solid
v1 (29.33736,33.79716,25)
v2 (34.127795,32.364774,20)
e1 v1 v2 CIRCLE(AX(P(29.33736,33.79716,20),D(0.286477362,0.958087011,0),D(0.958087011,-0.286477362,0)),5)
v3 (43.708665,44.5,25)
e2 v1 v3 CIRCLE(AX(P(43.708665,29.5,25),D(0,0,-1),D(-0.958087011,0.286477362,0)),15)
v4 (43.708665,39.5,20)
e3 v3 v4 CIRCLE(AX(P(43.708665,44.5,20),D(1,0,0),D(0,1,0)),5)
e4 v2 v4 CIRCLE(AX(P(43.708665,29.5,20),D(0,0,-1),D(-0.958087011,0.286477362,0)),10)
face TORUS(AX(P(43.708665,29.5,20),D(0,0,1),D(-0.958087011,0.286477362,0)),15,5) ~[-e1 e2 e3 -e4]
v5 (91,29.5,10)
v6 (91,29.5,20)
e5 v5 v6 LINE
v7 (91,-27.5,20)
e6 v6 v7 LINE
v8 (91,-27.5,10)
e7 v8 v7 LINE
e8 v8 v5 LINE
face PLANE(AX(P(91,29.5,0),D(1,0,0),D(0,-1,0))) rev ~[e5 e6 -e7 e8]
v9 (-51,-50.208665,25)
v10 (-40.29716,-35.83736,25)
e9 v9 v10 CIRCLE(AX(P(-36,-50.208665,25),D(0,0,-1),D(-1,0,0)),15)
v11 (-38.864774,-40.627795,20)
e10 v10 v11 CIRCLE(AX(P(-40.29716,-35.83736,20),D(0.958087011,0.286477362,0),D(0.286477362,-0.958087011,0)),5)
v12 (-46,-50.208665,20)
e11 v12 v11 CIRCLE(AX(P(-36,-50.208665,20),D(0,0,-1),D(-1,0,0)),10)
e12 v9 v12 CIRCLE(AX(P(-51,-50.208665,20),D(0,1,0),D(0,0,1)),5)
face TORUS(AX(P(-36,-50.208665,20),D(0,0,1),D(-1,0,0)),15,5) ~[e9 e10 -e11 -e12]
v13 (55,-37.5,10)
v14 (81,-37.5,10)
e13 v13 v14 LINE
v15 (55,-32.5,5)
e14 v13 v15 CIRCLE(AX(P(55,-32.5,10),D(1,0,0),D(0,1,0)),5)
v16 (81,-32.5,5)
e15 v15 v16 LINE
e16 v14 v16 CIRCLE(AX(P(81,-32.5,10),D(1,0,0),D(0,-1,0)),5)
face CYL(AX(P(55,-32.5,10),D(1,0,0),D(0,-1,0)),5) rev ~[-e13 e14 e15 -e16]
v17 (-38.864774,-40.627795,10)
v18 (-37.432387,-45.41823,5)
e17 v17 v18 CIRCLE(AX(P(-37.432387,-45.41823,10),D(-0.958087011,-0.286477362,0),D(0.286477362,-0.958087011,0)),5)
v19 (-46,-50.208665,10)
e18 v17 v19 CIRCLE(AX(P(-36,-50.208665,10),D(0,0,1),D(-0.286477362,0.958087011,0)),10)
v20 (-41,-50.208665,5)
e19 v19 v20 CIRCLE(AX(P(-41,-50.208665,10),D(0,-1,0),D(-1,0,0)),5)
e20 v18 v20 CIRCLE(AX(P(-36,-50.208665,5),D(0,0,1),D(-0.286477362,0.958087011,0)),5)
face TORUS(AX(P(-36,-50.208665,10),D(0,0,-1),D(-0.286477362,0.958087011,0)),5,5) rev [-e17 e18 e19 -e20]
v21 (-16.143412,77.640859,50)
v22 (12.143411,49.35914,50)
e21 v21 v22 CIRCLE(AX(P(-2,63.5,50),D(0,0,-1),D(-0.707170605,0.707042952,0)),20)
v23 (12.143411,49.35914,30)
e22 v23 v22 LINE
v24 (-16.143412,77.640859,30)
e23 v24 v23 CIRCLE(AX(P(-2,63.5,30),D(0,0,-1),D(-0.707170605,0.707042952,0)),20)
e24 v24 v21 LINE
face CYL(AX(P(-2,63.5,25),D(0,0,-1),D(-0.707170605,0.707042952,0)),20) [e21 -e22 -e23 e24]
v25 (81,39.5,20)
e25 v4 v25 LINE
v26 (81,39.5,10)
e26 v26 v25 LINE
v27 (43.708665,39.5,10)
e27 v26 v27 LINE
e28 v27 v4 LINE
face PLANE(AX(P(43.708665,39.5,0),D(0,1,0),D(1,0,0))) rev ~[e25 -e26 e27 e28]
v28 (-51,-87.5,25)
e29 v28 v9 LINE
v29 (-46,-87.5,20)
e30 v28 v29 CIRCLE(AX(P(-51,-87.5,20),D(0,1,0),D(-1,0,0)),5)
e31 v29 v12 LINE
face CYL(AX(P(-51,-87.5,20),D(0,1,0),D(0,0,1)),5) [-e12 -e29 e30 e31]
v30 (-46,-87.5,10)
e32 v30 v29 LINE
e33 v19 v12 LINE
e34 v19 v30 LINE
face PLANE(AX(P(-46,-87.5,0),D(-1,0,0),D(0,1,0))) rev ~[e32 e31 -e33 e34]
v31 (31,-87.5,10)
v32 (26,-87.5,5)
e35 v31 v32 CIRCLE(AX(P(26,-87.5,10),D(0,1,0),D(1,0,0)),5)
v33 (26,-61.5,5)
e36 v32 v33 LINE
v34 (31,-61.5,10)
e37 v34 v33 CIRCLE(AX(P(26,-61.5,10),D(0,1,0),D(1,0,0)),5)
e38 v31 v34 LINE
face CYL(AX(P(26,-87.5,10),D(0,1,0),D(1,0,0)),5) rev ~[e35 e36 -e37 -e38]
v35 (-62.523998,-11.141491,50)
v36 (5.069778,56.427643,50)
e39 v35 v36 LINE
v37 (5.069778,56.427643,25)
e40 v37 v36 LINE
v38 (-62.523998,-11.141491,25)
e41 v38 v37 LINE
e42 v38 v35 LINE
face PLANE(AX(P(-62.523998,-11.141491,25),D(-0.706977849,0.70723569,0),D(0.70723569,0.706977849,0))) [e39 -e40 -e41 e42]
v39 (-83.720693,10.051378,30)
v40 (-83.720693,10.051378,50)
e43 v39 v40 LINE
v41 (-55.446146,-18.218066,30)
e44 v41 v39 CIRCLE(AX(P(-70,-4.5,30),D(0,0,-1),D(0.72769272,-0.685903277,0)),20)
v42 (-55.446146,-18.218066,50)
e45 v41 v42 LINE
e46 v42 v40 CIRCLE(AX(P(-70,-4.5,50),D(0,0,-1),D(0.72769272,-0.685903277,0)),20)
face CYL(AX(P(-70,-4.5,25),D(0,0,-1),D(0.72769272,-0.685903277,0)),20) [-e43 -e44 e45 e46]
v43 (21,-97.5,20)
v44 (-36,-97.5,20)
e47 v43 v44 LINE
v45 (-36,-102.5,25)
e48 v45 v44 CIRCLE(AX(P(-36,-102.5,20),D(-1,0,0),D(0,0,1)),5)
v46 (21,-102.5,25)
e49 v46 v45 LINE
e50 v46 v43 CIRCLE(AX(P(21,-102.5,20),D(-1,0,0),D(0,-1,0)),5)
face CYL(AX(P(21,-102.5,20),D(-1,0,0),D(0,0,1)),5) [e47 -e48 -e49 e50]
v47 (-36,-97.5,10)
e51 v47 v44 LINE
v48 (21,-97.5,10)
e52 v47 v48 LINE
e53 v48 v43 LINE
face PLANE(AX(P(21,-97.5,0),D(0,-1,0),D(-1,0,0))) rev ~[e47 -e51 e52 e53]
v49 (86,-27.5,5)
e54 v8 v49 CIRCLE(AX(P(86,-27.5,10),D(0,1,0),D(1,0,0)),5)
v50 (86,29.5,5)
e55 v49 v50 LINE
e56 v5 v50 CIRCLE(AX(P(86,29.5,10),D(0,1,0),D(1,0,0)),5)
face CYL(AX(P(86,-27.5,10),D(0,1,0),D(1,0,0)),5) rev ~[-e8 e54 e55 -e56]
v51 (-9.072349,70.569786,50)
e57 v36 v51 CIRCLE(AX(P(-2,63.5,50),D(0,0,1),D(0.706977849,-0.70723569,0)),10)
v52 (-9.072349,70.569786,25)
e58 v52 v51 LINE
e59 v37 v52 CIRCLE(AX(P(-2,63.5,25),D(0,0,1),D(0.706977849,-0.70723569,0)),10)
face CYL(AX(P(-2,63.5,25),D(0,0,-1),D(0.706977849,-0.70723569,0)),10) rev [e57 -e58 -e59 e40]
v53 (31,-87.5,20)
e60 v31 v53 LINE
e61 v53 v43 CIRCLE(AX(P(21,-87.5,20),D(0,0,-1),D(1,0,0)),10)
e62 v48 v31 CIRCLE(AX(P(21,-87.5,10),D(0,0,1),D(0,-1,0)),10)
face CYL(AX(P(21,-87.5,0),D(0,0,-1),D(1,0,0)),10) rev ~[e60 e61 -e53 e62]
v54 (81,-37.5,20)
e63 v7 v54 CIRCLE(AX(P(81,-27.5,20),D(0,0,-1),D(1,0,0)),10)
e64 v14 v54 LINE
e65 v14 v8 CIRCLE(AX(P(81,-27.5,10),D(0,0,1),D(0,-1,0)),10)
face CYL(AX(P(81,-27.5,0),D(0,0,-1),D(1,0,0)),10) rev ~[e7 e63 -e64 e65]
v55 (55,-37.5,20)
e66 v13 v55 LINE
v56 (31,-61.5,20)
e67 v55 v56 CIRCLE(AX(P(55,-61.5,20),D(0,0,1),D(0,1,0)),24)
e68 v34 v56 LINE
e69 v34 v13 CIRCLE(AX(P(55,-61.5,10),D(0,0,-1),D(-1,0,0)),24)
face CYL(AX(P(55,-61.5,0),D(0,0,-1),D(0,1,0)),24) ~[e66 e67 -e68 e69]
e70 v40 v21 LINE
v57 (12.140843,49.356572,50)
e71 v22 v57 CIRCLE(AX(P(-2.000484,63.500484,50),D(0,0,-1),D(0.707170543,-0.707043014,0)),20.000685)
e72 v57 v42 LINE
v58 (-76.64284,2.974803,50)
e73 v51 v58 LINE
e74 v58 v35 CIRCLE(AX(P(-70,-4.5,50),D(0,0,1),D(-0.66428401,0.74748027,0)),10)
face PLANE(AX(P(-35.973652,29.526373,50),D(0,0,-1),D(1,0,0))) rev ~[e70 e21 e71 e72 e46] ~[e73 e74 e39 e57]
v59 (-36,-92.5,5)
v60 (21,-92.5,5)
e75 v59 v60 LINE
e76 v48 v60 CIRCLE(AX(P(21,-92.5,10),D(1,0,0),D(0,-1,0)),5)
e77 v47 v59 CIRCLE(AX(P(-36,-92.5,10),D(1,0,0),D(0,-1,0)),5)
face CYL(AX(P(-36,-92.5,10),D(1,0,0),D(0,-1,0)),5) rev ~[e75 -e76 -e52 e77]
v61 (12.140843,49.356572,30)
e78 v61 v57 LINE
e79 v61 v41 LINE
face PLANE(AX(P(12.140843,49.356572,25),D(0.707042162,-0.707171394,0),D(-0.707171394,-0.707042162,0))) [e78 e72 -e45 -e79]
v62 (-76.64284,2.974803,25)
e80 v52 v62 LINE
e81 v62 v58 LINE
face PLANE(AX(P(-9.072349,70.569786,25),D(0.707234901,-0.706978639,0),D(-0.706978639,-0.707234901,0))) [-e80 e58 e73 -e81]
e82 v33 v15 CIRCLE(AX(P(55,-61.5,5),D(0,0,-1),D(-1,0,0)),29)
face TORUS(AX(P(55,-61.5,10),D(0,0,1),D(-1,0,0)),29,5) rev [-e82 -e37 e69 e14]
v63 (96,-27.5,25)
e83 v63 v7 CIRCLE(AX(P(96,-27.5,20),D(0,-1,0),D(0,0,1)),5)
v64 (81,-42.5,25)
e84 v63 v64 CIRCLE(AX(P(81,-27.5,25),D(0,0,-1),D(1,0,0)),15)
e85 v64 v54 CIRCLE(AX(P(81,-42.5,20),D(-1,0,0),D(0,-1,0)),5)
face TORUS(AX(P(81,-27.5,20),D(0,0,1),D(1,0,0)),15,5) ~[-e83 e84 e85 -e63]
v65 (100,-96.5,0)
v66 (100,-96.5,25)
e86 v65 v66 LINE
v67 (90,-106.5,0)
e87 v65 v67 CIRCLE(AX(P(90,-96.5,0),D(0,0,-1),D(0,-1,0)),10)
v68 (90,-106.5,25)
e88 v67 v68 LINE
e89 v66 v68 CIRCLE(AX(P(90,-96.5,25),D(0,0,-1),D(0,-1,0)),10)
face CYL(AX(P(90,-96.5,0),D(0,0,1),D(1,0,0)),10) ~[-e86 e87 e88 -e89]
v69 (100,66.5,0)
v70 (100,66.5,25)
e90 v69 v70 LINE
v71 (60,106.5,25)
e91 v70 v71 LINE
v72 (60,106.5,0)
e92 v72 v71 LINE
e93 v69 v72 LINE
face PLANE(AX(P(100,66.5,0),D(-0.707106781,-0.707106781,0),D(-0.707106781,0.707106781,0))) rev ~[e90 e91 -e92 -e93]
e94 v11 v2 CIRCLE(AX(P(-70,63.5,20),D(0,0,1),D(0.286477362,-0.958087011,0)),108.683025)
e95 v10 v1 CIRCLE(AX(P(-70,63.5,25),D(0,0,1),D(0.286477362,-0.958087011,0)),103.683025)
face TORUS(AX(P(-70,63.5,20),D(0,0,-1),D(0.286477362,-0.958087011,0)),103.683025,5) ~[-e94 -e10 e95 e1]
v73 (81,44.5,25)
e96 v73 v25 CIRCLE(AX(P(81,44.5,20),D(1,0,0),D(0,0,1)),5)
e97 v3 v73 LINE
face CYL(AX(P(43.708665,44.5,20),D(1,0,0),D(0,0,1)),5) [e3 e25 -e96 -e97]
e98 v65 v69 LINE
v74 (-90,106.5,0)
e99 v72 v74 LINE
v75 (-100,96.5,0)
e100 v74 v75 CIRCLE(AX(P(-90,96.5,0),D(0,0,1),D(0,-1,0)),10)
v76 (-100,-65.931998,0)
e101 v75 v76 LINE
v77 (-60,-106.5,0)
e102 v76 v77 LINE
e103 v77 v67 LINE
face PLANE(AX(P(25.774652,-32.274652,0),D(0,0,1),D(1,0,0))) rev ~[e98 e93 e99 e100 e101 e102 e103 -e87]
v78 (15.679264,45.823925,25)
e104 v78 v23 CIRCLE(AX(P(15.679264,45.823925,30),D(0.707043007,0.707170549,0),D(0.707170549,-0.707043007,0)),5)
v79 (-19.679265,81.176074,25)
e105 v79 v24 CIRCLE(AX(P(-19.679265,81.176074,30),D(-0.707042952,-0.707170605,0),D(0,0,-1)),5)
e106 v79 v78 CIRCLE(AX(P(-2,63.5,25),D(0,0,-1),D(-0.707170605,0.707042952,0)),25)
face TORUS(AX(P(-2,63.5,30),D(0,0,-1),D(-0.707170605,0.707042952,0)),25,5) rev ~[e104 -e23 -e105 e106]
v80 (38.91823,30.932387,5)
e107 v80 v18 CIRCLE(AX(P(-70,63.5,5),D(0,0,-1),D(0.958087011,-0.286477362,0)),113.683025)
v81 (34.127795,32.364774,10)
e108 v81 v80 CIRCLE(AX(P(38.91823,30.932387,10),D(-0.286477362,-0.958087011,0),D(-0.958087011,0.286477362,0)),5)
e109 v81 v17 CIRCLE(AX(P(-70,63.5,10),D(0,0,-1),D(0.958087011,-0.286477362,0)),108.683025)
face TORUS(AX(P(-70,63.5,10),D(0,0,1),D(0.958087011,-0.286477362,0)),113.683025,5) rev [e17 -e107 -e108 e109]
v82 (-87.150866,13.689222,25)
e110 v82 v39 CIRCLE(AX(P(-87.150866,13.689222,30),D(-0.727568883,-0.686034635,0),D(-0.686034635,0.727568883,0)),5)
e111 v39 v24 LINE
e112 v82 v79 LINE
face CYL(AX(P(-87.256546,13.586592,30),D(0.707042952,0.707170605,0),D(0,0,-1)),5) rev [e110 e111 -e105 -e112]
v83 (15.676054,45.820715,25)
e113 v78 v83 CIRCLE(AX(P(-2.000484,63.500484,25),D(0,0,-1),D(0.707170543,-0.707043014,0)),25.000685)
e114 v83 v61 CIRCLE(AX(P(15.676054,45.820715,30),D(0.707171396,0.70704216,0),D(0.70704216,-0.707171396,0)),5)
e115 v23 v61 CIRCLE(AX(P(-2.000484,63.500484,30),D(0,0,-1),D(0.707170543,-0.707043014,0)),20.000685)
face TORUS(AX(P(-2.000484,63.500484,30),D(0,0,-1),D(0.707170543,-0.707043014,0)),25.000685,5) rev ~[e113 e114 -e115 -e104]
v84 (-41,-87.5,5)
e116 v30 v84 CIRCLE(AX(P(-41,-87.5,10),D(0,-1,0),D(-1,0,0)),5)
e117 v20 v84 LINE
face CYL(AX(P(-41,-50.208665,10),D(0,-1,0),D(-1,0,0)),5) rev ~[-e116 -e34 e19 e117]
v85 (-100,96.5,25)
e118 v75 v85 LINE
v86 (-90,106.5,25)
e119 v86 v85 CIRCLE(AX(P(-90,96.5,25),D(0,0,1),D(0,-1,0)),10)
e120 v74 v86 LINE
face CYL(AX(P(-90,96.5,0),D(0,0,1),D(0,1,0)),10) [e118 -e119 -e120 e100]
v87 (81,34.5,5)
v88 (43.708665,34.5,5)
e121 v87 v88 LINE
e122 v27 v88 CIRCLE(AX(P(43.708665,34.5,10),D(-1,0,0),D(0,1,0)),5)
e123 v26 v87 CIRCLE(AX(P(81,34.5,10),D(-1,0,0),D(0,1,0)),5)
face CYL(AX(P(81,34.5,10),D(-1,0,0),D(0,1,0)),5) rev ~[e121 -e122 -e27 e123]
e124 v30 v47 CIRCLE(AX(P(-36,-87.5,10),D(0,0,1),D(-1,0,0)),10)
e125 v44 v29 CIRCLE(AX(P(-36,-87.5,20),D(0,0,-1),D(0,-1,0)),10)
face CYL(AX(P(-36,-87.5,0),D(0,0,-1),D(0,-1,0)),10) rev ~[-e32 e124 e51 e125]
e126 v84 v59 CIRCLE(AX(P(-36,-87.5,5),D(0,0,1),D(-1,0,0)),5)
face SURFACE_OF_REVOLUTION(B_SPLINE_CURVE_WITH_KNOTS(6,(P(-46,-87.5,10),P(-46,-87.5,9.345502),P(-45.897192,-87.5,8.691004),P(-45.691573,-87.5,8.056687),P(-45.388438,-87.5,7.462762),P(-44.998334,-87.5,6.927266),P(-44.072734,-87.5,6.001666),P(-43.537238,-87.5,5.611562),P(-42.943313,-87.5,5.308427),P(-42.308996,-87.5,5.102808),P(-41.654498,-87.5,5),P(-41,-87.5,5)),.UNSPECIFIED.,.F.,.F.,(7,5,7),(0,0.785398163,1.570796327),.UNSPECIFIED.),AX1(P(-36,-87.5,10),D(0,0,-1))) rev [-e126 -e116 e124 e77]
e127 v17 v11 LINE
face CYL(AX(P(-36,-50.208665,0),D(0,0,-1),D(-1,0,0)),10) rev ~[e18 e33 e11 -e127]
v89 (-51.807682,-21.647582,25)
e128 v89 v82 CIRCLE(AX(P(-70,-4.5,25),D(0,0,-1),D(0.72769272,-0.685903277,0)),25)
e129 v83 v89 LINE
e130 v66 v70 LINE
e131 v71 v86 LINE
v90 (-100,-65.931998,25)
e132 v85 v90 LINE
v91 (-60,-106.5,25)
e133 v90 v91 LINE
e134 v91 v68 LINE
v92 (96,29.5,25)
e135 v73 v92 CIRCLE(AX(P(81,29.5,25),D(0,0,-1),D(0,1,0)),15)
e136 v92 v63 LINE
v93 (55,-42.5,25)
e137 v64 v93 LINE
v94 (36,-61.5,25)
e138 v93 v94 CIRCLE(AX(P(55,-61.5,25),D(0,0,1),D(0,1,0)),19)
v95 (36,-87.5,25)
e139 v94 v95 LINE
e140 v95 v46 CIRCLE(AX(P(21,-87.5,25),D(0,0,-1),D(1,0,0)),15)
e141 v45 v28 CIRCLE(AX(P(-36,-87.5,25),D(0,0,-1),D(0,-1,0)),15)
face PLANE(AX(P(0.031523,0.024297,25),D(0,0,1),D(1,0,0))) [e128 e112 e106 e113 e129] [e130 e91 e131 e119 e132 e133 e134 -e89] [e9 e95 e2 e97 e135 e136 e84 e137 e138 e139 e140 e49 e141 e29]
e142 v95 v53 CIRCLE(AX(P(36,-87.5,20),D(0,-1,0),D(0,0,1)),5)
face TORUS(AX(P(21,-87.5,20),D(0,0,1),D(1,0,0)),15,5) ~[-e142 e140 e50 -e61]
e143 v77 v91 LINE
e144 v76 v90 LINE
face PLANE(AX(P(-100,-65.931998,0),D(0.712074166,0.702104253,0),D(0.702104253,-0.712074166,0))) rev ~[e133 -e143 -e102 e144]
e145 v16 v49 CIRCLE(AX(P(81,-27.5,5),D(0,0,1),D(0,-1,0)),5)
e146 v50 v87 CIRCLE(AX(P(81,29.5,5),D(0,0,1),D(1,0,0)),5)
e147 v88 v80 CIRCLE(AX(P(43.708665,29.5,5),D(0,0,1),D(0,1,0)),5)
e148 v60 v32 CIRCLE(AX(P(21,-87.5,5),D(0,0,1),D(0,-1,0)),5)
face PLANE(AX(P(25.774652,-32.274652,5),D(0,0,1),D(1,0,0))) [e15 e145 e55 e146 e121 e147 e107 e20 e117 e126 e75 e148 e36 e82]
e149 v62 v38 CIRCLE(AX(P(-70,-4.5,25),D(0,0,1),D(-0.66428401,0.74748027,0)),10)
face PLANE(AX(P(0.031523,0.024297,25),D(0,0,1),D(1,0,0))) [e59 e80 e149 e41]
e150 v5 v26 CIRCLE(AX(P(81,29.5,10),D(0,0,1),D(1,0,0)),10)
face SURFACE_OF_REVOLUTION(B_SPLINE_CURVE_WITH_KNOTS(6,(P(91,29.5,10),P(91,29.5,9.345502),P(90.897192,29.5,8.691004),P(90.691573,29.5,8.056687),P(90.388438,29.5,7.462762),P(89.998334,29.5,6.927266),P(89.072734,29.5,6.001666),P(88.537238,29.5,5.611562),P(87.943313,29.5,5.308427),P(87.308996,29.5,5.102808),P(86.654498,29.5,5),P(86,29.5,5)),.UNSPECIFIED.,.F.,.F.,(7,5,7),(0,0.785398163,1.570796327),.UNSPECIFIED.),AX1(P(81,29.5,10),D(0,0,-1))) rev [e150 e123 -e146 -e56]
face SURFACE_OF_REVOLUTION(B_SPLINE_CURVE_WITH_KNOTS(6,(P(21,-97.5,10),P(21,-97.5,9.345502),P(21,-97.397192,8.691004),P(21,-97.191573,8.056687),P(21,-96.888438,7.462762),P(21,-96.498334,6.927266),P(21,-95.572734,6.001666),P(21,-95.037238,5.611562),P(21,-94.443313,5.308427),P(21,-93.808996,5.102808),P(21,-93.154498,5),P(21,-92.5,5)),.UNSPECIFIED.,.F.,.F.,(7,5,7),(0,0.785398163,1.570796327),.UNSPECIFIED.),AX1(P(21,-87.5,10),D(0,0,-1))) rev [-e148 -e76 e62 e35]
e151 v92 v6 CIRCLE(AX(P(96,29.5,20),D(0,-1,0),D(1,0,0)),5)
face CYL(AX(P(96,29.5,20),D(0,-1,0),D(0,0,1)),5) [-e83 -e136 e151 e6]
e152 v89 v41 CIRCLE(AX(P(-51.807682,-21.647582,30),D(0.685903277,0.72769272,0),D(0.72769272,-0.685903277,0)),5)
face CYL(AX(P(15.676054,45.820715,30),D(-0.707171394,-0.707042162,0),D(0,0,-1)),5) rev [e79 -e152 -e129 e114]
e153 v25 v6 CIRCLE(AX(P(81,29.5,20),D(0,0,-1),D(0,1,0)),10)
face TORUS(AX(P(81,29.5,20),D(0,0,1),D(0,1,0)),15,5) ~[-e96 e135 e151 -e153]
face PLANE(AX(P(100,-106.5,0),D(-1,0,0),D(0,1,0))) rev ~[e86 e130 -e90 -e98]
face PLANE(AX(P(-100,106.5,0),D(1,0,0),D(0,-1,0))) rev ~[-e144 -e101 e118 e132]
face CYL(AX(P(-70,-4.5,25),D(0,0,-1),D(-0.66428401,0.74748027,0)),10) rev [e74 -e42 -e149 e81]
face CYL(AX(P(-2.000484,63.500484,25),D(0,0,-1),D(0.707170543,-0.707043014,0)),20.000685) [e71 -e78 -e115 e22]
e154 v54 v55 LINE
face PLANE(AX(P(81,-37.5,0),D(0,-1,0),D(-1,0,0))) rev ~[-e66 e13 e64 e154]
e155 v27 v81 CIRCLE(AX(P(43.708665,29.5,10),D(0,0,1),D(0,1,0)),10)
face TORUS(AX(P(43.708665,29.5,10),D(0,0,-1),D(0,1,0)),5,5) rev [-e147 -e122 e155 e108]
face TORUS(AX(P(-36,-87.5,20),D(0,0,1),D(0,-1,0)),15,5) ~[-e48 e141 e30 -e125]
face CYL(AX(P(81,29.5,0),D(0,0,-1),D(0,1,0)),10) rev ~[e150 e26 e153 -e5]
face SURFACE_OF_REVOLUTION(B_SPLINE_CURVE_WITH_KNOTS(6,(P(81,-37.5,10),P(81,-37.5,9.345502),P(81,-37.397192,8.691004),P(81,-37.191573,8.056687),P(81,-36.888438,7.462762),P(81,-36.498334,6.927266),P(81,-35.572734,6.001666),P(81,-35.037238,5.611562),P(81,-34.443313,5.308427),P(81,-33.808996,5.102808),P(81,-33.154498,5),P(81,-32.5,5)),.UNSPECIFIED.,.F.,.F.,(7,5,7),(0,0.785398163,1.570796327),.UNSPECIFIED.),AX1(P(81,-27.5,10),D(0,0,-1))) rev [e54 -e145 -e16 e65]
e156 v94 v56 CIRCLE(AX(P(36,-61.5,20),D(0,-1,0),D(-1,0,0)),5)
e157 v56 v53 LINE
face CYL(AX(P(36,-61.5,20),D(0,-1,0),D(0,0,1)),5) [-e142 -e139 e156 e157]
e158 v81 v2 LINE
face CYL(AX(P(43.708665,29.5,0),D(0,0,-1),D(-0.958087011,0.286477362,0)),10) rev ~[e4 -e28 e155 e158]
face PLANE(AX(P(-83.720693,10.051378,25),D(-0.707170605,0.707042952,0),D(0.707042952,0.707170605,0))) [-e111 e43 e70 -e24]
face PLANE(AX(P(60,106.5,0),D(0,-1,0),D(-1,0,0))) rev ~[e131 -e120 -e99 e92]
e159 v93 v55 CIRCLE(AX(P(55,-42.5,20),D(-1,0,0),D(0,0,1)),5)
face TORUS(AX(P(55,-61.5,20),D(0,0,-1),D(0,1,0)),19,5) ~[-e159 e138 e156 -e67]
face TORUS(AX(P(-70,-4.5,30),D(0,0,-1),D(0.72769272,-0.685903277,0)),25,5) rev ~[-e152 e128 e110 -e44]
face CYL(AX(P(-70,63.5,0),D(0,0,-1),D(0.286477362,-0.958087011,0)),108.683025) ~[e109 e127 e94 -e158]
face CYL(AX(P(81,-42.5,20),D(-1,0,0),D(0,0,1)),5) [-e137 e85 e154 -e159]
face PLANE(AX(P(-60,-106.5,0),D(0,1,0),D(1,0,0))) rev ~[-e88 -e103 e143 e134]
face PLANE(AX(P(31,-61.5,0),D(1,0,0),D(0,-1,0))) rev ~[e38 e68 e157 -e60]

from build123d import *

# Parameters (mm, degrees)
F1_DEPTH = 25
F4_DEPTH = 25
F5_DEPTH = 5
F6_R     = 5
F7_R     = 10


with BuildPart() as f1:
    # F0 (on Top) → F1 (new body)
    with BuildSketch(Plane.XY):
        Polygon((60, 106.5), (-100, 106.5), (-100, -65.9319981933), (-60, -106.5), (100, -106.5), (100, 66.5), align=None)
        with BuildLine():
            Line((81, -37.5), (55, -37.5))
            ThreePointArc((55, -37.5), (38.0294372515, -44.5294372515), (31, -61.5))
            Line((31, -61.5), (31, -87.5))
            ThreePointArc((31, -87.5), (28.0710678119, -94.5710678119), (21, -97.5))
            Line((21, -97.5), (-36, -97.5))
            ThreePointArc((-36, -97.5), (-43.0710678119, -94.5710678119), (-46, -87.5))
            Line((-46, -87.5), (-46, -50.2086650483))
            ThreePointArc((-46, -50.2086650483), (-44.0202162123, -44.2357150312), (-38.8647736185, -40.6277949357))
            ThreePointArc((-38.8647736185, -40.6277949357), (6.8505042274, -13.3505042274), (34.1277949357, 32.3647736185))
            ThreePointArc((34.1277949357, 32.3647736185), (37.7357150312, 37.5202162123), (43.7086650483, 39.5))
            Line((43.7086650483, 39.5), (81, 39.5))
            ThreePointArc((81, 39.5), (88.0710678119, 36.5710678119), (91, 29.5))
            Line((91, 29.5), (91, -27.5))
            ThreePointArc((91, -27.5), (88.0710678119, -34.5710678119), (81, -37.5))
        make_face(mode=Mode.SUBTRACT)
    extrude(amount=F1_DEPTH)

    # F3 (on offset) → F4 (join)
    with BuildSketch(Plane(origin=(0, 0, 25), x_dir=(1, 0, 0), z_dir=(0, 0, -1))):
        with BuildLine():
            Line((12.1408432435, -49.3565721142), (-55.4461455939, 18.2180655315))
            ThreePointArc((-55.4461455939, 18.2180655315), (-84.1408590322, 18.6434121001), (-83.720692703, -10.0513776581))
            Line((-83.720692703, -10.0513776581), (-16.1434121001, -77.6408590322))
            ThreePointArc((-16.1434121001, -77.6408590322), (12.1408595897, -77.6434115426), (12.1434109852, -49.3591398528))
            ThreePointArc((12.1434109852, -49.3591398528), (12.1421271726, -49.3578559252), (12.1408432435, -49.3565721142))
        make_face()
        with BuildLine():
            ThreePointArc((-76.6428401008, -2.9748026994), (-77.0704295161, 11.57170605), (-62.5239981961, 11.1414905727))
            Line((-62.5239981961, 11.1414905727), (5.0697784915, -56.4276431028))
            ThreePointArc((5.0697784915, -56.4276431028), (5.0710717587, -70.5710638651), (-9.072349005, -70.5697863865))
            Line((-9.072349005, -70.5697863865), (-76.6428401008, -2.9748026994))
        make_face(mode=Mode.SUBTRACT)
    extrude(amount=-F4_DEPTH)

    # F0 (on Top) → F5 (join)
    with BuildSketch(Plane.XY):
        with BuildLine():
            ThreePointArc((31, -61.5), (38.0294372515, -44.5294372515), (55, -37.5))
            Line((55, -37.5), (81, -37.5))
            ThreePointArc((81, -37.5), (88.0710678119, -34.5710678119), (91, -27.5))
            Line((91, -27.5), (91, 29.5))
            ThreePointArc((91, 29.5), (88.0710678119, 36.5710678119), (81, 39.5))
            Line((81, 39.5), (43.7086650483, 39.5))
            ThreePointArc((43.7086650483, 39.5), (37.7357150312, 37.5202162123), (34.1277949357, 32.3647736185))
            ThreePointArc((34.1277949357, 32.3647736185), (6.8505042274, -13.3505042274), (-38.8647736185, -40.6277949357))
            ThreePointArc((-38.8647736185, -40.6277949357), (-44.0202162123, -44.2357150312), (-46, -50.2086650483))
            Line((-46, -50.2086650483), (-46, -87.5))
            ThreePointArc((-46, -87.5), (-43.0710678119, -94.5710678119), (-36, -97.5))
            Line((-36, -97.5), (21, -97.5))
            ThreePointArc((21, -97.5), (28.0710678119, -94.5710678119), (31, -87.5))
            Line((31, -87.5), (31, -61.5))
        make_face()
    extrude(amount=F5_DEPTH)

    # F6
    f6_edges = [f1.edges().sort_by_distance(p)[0] for p in [
        (-84.140859, -18.643412, 25),
        (-21.652651, 15.569253, 25),
        (6.850504, -13.350504, 25),
        (31, -74.5, 5),
        (38.029437, -44.529437, 5),
        (68, -37.5, 5),
        (88.071068, -34.571068, 5),
        (91, 1, 5),
        (88.071068, 36.571068, 5),
        (62.354333, 39.5, 5),
        (37.735715, 37.520216, 5),
        (6.850504, -13.350504, 5),
        (-44.020216, -44.235715, 5),
        (-46, -68.854333, 5),
        (-43.071068, -94.571068, 5),
        (-7.5, -97.5, 5),
        (28.071068, -94.571068, 5),
    ]]
    fillet(f6_edges, radius=F6_R)

    # F7
    f7_edges = [f1.edges().sort_by_distance(p)[0] for p in [
        (-100, 106.5, 12.5),
        (100, -106.5, 12.5),
    ]]
    fillet(f7_edges, radius=F7_R)


solid = f1.part
